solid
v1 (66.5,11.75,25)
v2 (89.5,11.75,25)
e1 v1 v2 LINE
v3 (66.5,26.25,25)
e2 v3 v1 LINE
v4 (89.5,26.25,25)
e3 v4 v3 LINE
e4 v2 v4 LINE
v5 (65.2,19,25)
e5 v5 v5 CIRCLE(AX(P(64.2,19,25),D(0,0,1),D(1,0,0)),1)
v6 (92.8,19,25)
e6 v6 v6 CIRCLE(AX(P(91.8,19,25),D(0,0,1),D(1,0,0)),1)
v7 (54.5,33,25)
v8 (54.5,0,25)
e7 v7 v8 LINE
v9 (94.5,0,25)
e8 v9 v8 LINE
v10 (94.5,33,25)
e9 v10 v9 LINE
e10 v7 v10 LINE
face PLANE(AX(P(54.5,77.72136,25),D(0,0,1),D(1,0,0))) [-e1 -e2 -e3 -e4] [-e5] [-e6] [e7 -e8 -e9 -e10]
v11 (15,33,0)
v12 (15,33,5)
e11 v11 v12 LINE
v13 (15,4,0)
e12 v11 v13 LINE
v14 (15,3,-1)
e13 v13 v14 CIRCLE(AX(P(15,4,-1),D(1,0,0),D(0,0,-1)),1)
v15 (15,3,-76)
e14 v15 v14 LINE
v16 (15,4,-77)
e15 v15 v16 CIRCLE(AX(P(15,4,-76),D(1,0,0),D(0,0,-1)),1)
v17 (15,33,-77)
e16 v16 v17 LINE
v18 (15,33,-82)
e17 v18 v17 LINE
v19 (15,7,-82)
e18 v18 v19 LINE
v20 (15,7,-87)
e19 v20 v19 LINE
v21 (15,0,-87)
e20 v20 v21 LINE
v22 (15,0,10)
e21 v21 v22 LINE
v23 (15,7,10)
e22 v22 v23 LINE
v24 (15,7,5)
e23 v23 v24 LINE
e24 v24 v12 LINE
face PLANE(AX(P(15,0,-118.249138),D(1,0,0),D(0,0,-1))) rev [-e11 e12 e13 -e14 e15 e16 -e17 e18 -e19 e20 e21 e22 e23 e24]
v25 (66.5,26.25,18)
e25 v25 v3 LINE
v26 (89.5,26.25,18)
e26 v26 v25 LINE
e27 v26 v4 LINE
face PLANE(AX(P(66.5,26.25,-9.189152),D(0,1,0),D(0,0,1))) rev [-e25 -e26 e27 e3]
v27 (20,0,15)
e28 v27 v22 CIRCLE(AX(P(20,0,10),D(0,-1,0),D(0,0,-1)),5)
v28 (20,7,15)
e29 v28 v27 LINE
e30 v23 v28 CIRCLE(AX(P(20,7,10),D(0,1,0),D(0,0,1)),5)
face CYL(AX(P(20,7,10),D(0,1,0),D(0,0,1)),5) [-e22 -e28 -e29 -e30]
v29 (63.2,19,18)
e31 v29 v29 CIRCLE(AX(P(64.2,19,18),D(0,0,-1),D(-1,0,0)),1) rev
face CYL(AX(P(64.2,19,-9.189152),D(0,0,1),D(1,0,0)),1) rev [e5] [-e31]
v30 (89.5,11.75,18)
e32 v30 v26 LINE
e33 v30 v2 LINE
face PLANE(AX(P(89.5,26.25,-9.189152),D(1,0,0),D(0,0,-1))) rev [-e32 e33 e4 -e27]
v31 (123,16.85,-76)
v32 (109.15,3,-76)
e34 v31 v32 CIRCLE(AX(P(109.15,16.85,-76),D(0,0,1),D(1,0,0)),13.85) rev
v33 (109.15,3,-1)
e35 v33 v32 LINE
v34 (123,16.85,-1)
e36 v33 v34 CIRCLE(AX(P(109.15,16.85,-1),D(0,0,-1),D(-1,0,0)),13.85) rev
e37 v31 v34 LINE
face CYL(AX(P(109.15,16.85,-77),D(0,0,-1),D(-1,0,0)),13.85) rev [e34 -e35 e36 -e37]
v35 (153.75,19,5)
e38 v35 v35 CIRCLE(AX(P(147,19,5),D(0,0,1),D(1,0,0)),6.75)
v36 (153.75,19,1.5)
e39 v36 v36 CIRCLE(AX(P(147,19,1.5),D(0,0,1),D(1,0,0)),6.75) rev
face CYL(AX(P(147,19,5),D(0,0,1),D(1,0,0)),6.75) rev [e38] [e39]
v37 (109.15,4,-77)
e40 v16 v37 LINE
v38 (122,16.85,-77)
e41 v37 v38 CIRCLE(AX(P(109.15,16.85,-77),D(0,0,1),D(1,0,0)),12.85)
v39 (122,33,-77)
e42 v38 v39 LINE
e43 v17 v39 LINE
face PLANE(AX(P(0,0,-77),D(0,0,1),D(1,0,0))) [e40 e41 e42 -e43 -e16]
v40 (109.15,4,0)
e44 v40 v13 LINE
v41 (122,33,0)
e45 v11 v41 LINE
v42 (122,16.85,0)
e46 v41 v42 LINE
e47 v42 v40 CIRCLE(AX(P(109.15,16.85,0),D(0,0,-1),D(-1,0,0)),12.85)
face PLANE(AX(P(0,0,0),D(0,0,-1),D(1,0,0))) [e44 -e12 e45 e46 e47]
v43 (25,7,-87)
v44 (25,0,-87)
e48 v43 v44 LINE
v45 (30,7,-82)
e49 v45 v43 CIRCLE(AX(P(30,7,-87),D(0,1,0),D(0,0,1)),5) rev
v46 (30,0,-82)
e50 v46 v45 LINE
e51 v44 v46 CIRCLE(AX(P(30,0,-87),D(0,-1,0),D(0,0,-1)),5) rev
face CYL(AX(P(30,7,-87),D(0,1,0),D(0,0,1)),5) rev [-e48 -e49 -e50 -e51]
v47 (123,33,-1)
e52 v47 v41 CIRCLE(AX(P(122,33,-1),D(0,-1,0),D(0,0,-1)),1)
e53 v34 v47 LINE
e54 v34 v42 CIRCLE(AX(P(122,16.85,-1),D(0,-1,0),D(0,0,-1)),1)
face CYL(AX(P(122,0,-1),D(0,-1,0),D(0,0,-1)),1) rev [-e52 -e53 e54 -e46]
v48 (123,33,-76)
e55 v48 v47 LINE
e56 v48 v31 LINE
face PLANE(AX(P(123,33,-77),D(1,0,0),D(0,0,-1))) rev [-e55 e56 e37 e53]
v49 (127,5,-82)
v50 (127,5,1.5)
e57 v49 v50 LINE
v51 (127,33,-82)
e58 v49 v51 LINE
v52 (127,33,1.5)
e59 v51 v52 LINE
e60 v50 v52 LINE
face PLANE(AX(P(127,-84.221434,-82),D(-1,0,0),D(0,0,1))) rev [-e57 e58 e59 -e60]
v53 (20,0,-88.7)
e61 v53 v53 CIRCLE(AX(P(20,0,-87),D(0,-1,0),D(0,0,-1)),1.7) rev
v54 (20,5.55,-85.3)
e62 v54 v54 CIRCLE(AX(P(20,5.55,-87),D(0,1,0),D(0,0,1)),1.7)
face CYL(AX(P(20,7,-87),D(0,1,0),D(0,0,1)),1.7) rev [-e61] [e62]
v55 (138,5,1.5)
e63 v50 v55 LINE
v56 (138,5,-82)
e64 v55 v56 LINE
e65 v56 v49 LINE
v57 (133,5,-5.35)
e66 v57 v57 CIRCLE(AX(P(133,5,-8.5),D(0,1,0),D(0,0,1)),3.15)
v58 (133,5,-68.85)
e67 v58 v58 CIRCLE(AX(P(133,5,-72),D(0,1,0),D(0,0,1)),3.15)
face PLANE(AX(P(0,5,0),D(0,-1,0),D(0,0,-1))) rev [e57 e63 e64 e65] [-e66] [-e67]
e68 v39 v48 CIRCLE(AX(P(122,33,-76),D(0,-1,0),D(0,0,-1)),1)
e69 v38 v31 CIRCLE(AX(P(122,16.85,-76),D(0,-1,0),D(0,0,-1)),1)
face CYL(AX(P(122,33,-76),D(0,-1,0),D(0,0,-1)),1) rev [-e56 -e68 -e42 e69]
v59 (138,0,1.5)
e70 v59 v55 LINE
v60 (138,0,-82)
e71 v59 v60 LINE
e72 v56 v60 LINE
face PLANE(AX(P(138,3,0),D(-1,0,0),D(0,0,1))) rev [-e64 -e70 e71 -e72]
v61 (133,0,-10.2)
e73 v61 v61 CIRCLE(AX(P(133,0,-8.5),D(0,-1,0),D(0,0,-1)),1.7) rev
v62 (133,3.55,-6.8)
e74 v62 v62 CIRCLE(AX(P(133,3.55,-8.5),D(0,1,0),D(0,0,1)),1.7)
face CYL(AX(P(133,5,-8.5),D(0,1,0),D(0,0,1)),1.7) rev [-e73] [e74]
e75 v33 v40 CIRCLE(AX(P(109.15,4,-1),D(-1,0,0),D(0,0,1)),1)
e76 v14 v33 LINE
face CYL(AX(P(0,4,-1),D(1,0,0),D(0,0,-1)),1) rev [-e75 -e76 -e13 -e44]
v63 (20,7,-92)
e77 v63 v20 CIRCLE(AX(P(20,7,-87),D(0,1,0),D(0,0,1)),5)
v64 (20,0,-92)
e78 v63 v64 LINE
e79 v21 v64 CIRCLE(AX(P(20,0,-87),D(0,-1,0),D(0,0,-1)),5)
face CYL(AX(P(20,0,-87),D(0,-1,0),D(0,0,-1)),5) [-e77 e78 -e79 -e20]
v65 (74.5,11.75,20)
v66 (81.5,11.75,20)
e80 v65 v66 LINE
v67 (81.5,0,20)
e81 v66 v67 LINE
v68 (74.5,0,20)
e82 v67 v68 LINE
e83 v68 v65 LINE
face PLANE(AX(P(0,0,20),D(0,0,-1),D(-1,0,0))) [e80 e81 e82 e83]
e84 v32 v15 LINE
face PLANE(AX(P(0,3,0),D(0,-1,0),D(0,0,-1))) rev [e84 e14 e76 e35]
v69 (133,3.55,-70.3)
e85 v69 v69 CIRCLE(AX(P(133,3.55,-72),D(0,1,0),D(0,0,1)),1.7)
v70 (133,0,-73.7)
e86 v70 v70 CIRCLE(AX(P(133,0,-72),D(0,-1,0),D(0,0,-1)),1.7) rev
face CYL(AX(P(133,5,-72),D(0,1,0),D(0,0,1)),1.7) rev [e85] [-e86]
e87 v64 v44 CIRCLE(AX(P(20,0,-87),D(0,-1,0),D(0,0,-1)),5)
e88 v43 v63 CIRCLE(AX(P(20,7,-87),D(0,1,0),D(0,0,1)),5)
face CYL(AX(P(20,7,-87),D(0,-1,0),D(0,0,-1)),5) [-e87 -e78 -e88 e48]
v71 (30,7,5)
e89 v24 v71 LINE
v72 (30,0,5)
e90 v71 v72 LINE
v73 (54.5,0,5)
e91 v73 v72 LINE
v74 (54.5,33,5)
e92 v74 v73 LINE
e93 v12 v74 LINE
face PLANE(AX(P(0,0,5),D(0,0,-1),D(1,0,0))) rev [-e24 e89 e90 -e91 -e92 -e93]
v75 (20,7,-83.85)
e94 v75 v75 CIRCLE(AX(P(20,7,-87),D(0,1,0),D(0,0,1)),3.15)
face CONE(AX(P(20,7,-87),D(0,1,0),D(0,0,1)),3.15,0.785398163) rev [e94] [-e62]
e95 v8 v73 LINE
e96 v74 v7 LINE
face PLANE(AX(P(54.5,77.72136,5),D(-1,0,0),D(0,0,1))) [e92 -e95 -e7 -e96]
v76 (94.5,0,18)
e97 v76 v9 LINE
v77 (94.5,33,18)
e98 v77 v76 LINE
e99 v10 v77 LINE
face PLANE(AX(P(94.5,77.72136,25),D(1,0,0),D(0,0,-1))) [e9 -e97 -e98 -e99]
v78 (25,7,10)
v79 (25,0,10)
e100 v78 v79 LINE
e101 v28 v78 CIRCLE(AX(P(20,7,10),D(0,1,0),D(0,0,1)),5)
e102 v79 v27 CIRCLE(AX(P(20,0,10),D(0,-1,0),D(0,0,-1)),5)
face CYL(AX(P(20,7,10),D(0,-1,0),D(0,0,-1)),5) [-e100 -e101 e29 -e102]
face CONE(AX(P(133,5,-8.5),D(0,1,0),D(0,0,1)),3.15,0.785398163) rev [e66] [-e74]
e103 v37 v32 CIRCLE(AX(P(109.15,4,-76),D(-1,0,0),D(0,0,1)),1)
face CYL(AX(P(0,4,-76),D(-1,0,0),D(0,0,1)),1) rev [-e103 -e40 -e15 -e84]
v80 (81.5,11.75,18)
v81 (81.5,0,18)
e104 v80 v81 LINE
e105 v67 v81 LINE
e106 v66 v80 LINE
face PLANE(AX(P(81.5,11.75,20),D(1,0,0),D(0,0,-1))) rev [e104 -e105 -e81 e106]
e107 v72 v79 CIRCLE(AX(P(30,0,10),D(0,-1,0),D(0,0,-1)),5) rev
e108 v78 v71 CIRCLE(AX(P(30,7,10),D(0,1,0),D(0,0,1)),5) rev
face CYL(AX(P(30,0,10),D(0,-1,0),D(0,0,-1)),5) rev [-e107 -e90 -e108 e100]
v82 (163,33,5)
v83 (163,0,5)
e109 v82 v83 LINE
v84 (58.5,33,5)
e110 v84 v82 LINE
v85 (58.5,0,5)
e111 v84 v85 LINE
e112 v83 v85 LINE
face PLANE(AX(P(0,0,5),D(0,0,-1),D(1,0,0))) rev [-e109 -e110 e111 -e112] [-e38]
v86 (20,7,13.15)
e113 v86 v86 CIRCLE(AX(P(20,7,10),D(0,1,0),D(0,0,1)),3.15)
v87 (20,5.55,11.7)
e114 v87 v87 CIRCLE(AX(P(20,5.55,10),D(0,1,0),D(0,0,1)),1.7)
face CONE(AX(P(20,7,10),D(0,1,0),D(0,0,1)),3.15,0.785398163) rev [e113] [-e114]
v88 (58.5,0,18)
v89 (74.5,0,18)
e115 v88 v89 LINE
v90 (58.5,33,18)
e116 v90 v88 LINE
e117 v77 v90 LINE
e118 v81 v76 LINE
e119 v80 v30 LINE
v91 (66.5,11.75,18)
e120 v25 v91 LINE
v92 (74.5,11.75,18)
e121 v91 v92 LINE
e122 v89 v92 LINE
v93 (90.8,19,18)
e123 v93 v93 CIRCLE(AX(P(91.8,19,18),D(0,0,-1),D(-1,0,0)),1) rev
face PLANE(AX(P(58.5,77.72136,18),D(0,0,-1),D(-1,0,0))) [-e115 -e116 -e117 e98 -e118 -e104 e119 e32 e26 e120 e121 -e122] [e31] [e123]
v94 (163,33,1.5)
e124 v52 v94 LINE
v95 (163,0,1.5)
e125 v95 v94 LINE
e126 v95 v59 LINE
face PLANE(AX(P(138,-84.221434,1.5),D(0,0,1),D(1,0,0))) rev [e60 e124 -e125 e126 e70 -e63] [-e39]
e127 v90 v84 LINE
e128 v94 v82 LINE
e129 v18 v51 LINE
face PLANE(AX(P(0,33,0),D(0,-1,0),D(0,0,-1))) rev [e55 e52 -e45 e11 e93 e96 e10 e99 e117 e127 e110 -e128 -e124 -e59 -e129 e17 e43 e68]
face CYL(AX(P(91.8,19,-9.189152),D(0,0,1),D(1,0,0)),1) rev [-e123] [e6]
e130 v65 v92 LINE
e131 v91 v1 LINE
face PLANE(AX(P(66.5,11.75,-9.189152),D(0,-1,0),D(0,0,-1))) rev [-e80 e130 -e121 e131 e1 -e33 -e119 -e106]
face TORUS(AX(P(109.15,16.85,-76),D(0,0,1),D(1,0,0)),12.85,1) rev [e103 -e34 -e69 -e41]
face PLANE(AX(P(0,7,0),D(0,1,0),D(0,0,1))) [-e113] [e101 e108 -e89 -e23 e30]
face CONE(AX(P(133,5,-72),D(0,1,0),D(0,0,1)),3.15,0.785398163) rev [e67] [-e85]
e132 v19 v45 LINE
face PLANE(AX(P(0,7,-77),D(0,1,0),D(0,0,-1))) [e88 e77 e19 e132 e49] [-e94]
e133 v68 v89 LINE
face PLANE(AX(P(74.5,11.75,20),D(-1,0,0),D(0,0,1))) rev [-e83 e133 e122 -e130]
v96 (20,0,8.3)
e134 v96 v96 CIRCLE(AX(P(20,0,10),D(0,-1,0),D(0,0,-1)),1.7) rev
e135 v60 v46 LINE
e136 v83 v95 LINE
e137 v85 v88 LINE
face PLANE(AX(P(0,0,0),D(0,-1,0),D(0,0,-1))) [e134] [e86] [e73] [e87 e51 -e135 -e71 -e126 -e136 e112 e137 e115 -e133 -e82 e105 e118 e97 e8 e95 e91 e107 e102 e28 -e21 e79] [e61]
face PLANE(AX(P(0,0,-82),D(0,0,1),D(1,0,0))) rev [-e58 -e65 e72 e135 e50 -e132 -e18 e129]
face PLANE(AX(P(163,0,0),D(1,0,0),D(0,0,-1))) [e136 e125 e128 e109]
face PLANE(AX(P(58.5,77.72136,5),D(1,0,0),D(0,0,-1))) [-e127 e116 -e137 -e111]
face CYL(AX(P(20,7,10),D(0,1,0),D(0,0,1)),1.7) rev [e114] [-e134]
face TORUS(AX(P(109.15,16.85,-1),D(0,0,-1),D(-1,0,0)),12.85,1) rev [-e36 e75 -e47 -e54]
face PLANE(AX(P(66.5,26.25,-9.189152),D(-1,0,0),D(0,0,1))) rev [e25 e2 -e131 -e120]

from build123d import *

# Parameters (mm, degrees)
ESQUISSE1_W                                    = 138
ESQUISSE1_H                                    = 77
BOSS_EXTRU_1_DEPTH                             = 3
ESQUISSE2_W                                    = 15
ESQUISSE2_H                                    = 77
BOSS_EXTRU_2_DEPTH                             = 30
CONG_1_R                                       = 13.85
ESQUISSE3_W                                    = 138
ESQUISSE3_H                                    = 33
BOSS_EXTRU_3_DEPTH                             = 5
ENL_V_MAT_EXTRU_13_REACH                       = 168.439
ESQUISSE26_W                                   = 15
ESQUISSE26_H                                   = 33
CONG_5_R                                       = 1
ESQUISSE33_W                                   = 11
ESQUISSE33_H                                   = 83.5
ENL_V_MAT_EXTRU_15_DEPTH                       = 28
ESQUISSE34_W                                   = 3.5
ESQUISSE34_H                                   = 33
BOSS_EXTRU_8_DEPTH                             = 25
BOSS_EXTRU_11_DEPTH                            = 33
ESQUISSE35_R                                   = 1
ESQUISSE35_W                                   = 23
ESQUISSE35_H                                   = 14.5
ENL_V_MAT_EXTRU_16_DEPTH                       = 7
ESQUISSE36_W                                   = 7
ESQUISSE36_H                                   = 11.75
ENL_V_MAT_EXTRU_17_DEPTH                       = 2
ESQUISSE44_R                                   = 6
ENL_V_MAT_EXTRU_19_DEPTH                       = 3.5
D_GAGEMENT_M124_D                              = 13.5
D_GAGEMENT_M124_DEPTH                          = 3.5
D_GAGEMENT_M124_TIP                            = 4.055809178
ESQUISSE48_R                                   = 1.5
ENL_V_MAT_EXTRU_20_DEPTH                       = 5
FRAISAGE_POUR_VIS_T_TE_FRAIS_E_M32_D           = 3.4
FRAISAGE_POUR_VIS_T_TE_FRAIS_E_M32_DEPTH       = 5
FRAISAGE_POUR_VIS_T_TE_FRAIS_E_M32_CSINK_D     = 6.3
FRAISAGE_POUR_VIS_T_TE_FRAIS_E_M32_CSINK_ANGLE = 90
FRAISAGE_POUR_VIS_T_TE_FRAIS_E_M32_TIP         = 1.021463052
ESQUISSE52_W                                   = 10
ESQUISSE52_H                                   = 10
BOSS_EXTRU_12_DEPTH                            = 7
ESQUISSE53_R                                   = 1.5
ENL_V_MAT_EXTRU_21_DEPTH                       = 7
CONG_8_R                                       = 5


with BuildPart() as part:
    # Esquisse1 → Boss.-Extru.1 (new body)
    with BuildSketch(Plane(origin=(0, 0, 0), x_dir=(1, 0, 0), z_dir=(0, 1, 0))):
        with Locations((69, 38.5)):
            Rectangle(ESQUISSE1_W, ESQUISSE1_H)
    extrude(amount=BOSS_EXTRU_1_DEPTH)

    # Esquisse2 → Boss.-Extru.2 (add)
    with BuildSketch(Plane(origin=(0, 3, 0), x_dir=(1, 0, 0), z_dir=(0, 1, 0))):
        with Locations((130.5, 38.5)):
            Rectangle(ESQUISSE2_W, ESQUISSE2_H)
    extrude(amount=BOSS_EXTRU_2_DEPTH)

    # Congé1
    cong_1_edges = [part.edges().sort_by_distance(p)[0] for p in [
        (123, 3, -38.5),
    ]]
    fillet(cong_1_edges, radius=CONG_1_R)

    # Esquisse3 → Boss.-Extru.3 (add)
    with BuildSketch(Plane(origin=(0, 0, -77), x_dir=(-1, 0, 0), z_dir=(0, 0, -1))):
        with Locations((-69, 16.5)):
            Rectangle(ESQUISSE3_W, ESQUISSE3_H)
    boss_extru_3 = extrude(amount=BOSS_EXTRU_3_DEPTH)

    # Symétrie1: Boss.-Extru.3 across plane
    add(boss_extru_3.mirror(Plane.XY.offset(-38.5)))

    # Enlèv. mat.-Extru.13: up to this face of the body (flat: up to its plane)
    enl_v_mat_extru_13_end = Plane(part.part.faces().sort_by_distance((69, 16.5, -82))[0])
    # Esquisse26 → Enlèv. mat.-Extru.13 (cut, up to the picked face)
    with BuildSketch(Plane.XY.offset(5), mode=Mode.PRIVATE) as enl_v_mat_extru_13_sk1:
        with Locations((7.5, 16.5)):
            Rectangle(ESQUISSE26_W, ESQUISSE26_H)
    enl_v_mat_extru_13_tool1 = split(extrude(enl_v_mat_extru_13_sk1.sketch, amount=-ENL_V_MAT_EXTRU_13_REACH, mode=Mode.PRIVATE), bisect_by=enl_v_mat_extru_13_end, keep=Keep.BOTH, mode=Mode.PRIVATE)
    add(enl_v_mat_extru_13_tool1.solids().sort_by(Axis((7.5, 16.5, 5), (0, 0, -1)))[0], mode=Mode.SUBTRACT)

    # Congé5
    cong_5_edges = [part.edges().sort_by_distance(p)[0] for p in [
        (123, 24.925, -77),
        (123, 24.925, 0),
        (62.075, 3, -77),
        (118.943428919, 7.056571081, 0),
        (118.943428919, 7.056571081, -77),
        (62.075, 3, 0),
    ]]
    fillet(cong_5_edges, radius=CONG_5_R)

    # Esquisse33 → Enlèv. mat.-Extru.15 (cut)
    with BuildSketch(Plane(origin=(0, 33, 0), x_dir=(1, 0, 0), z_dir=(0, 1, 0))):
        with Locations((132.5, 40.25)):
            Rectangle(ESQUISSE33_W, ESQUISSE33_H)
    extrude(amount=-ENL_V_MAT_EXTRU_15_DEPTH, mode=Mode.SUBTRACT)

    # Esquisse34 → Boss.-Extru.8 (add)
    with BuildSketch(Plane(origin=(138, 0, 0), x_dir=(0, 0, -1), z_dir=(1, 0, 0))):
        with Locations((-3.25, 16.5)):
            Rectangle(ESQUISSE34_W, ESQUISSE34_H)
    extrude(amount=BOSS_EXTRU_8_DEPTH)

    # Esquisse43 → Boss.-Extru.11 (add)
    with BuildSketch(Plane.XZ):
        Polygon((54.5, 5), (58.5, 5), (58.5, 18), (94.5, 18), (94.5, 25), (54.5, 25), align=None)
    extrude(amount=-BOSS_EXTRU_11_DEPTH)

    # Esquisse35 → Enlèv. mat.-Extru.16 (cut)
    with BuildSketch(Plane.XY.offset(25)):
        with Locations((91.8, 19)):
            Circle(ESQUISSE35_R)
        with Locations((64.2, 19)):
            Circle(ESQUISSE35_R)
        with Locations((78, 19)):
            Rectangle(ESQUISSE35_W, ESQUISSE35_H)
    extrude(amount=-ENL_V_MAT_EXTRU_16_DEPTH, mode=Mode.SUBTRACT)

    # Esquisse36 → Enlèv. mat.-Extru.17 (cut)
    with BuildSketch(Plane(origin=(0, 0, 18), x_dir=(-1, 0, 0), z_dir=(0, 0, -1))):
        with Locations((-78, 5.875)):
            Rectangle(ESQUISSE36_W, ESQUISSE36_H)
    extrude(amount=-ENL_V_MAT_EXTRU_17_DEPTH, mode=Mode.SUBTRACT)

    # Esquisse44 → Enlèv. mat.-Extru.19 (cut)
    with BuildSketch(Plane.XY.offset(5)):
        with Locations((147, 19)):
            Circle(ESQUISSE44_R)
    extrude(amount=-ENL_V_MAT_EXTRU_19_DEPTH, mode=Mode.SUBTRACT)

    # Dégagement M124
    with Locations(Plane.XY.offset(5)):
        with Locations((147, 19)):
            Hole(D_GAGEMENT_M124_D / 2, depth=D_GAGEMENT_M124_DEPTH)
            with Locations((0, 0, -(D_GAGEMENT_M124_DEPTH + D_GAGEMENT_M124_TIP / 2))):  # 118° drill point
                Cone(0, D_GAGEMENT_M124_D / 2, D_GAGEMENT_M124_TIP, mode=Mode.SUBTRACT)

    # Esquisse48 → Enlèv. mat.-Extru.20 (cut)
    with BuildSketch(Plane(origin=(0, 5, 0), x_dir=(1, 0, 0), z_dir=(0, 1, 0))):
        with Locations(Location((133, 8.5, 0), (0, 0, 270))):
            Circle(ESQUISSE48_R)
        with Locations(Location((133, 72, 0), (0, 0, 270))):
            Circle(ESQUISSE48_R)
    extrude(amount=-ENL_V_MAT_EXTRU_20_DEPTH, mode=Mode.SUBTRACT)

    # Fraisage pour vis à tête fraisée M32
    with Locations(Plane(origin=(0, 5, 0), x_dir=(1, 0, 0), z_dir=(0, 1, 0))):
        with Locations((133, 72), (133, 8.5)):
            CounterSinkHole(FRAISAGE_POUR_VIS_T_TE_FRAIS_E_M32_D / 2, FRAISAGE_POUR_VIS_T_TE_FRAIS_E_M32_CSINK_D / 2, depth=FRAISAGE_POUR_VIS_T_TE_FRAIS_E_M32_DEPTH, counter_sink_angle=FRAISAGE_POUR_VIS_T_TE_FRAIS_E_M32_CSINK_ANGLE)
            with Locations((0, 0, -(FRAISAGE_POUR_VIS_T_TE_FRAIS_E_M32_DEPTH + FRAISAGE_POUR_VIS_T_TE_FRAIS_E_M32_TIP / 2))):  # 118° drill point
                Cone(0, FRAISAGE_POUR_VIS_T_TE_FRAIS_E_M32_D / 2, FRAISAGE_POUR_VIS_T_TE_FRAIS_E_M32_TIP, mode=Mode.SUBTRACT)

    # Esquisse52 → Boss.-Extru.12 (add)
    with BuildSketch(Plane.XZ):
        with Locations((20, 10)):
            Rectangle(ESQUISSE52_W, ESQUISSE52_H)
    boss_extru_12 = extrude(amount=-BOSS_EXTRU_12_DEPTH)

    # Esquisse53 → Enlèv. mat.-Extru.21 (cut)
    with BuildSketch(Plane(origin=(0, 7, 0), x_dir=(1, 0, 0), z_dir=(0, 1, 0))):
        with Locations(Location((20, -10, 0), (0, 0, 270))):
            Circle(ESQUISSE53_R)
    enl_v_mat_extru_21 = extrude(amount=-ENL_V_MAT_EXTRU_21_DEPTH, mode=Mode.SUBTRACT)

    # Esquisse55 → Fraisage pour vis à tête fraisée M33 (revolve, cut)
    with BuildSketch(Plane(origin=(20, 7, 10), x_dir=(0, 0, 1), z_dir=(1, 0, 0))):
        Polygon((0, 0), (0, 8.021463052), (1.7, 7), (1.7, 1.45), (3.15, 0), align=None)
    fraisage_pour_vis_t_te_frais_e_m33 = revolve(axis=Axis((20, 13.35, 10), (0, -1, 0)), mode=Mode.SUBTRACT)

    # Symétrie2: Boss.-Extru.12, Enlèv. mat.-Extru.21, Fraisage pour vis à tête fraisée M33 across plane
    add(boss_extru_12.mirror(Plane.XY.offset(-38.5)))
    add(enl_v_mat_extru_21.mirror(Plane.XY.offset(-38.5)), mode=Mode.SUBTRACT)
    add(fraisage_pour_vis_t_te_frais_e_m33.mirror(Plane.XY.offset(-38.5)), mode=Mode.SUBTRACT)

    # Congé8
    cong_8_edges = [part.edges().sort_by_distance(p)[0] for p in [
        (25, 3.5, 5),
        (25, 3.5, 15),
        (15, 3.5, 15),
        (15, 3.5, -92),
        (25, 3.5, -92),
        (25, 3.5, -82),
    ]]
    fillet(cong_8_edges, radius=CONG_8_R - 0.0001)  # a hair under: the kernel refuses the full size


solid = part.part
